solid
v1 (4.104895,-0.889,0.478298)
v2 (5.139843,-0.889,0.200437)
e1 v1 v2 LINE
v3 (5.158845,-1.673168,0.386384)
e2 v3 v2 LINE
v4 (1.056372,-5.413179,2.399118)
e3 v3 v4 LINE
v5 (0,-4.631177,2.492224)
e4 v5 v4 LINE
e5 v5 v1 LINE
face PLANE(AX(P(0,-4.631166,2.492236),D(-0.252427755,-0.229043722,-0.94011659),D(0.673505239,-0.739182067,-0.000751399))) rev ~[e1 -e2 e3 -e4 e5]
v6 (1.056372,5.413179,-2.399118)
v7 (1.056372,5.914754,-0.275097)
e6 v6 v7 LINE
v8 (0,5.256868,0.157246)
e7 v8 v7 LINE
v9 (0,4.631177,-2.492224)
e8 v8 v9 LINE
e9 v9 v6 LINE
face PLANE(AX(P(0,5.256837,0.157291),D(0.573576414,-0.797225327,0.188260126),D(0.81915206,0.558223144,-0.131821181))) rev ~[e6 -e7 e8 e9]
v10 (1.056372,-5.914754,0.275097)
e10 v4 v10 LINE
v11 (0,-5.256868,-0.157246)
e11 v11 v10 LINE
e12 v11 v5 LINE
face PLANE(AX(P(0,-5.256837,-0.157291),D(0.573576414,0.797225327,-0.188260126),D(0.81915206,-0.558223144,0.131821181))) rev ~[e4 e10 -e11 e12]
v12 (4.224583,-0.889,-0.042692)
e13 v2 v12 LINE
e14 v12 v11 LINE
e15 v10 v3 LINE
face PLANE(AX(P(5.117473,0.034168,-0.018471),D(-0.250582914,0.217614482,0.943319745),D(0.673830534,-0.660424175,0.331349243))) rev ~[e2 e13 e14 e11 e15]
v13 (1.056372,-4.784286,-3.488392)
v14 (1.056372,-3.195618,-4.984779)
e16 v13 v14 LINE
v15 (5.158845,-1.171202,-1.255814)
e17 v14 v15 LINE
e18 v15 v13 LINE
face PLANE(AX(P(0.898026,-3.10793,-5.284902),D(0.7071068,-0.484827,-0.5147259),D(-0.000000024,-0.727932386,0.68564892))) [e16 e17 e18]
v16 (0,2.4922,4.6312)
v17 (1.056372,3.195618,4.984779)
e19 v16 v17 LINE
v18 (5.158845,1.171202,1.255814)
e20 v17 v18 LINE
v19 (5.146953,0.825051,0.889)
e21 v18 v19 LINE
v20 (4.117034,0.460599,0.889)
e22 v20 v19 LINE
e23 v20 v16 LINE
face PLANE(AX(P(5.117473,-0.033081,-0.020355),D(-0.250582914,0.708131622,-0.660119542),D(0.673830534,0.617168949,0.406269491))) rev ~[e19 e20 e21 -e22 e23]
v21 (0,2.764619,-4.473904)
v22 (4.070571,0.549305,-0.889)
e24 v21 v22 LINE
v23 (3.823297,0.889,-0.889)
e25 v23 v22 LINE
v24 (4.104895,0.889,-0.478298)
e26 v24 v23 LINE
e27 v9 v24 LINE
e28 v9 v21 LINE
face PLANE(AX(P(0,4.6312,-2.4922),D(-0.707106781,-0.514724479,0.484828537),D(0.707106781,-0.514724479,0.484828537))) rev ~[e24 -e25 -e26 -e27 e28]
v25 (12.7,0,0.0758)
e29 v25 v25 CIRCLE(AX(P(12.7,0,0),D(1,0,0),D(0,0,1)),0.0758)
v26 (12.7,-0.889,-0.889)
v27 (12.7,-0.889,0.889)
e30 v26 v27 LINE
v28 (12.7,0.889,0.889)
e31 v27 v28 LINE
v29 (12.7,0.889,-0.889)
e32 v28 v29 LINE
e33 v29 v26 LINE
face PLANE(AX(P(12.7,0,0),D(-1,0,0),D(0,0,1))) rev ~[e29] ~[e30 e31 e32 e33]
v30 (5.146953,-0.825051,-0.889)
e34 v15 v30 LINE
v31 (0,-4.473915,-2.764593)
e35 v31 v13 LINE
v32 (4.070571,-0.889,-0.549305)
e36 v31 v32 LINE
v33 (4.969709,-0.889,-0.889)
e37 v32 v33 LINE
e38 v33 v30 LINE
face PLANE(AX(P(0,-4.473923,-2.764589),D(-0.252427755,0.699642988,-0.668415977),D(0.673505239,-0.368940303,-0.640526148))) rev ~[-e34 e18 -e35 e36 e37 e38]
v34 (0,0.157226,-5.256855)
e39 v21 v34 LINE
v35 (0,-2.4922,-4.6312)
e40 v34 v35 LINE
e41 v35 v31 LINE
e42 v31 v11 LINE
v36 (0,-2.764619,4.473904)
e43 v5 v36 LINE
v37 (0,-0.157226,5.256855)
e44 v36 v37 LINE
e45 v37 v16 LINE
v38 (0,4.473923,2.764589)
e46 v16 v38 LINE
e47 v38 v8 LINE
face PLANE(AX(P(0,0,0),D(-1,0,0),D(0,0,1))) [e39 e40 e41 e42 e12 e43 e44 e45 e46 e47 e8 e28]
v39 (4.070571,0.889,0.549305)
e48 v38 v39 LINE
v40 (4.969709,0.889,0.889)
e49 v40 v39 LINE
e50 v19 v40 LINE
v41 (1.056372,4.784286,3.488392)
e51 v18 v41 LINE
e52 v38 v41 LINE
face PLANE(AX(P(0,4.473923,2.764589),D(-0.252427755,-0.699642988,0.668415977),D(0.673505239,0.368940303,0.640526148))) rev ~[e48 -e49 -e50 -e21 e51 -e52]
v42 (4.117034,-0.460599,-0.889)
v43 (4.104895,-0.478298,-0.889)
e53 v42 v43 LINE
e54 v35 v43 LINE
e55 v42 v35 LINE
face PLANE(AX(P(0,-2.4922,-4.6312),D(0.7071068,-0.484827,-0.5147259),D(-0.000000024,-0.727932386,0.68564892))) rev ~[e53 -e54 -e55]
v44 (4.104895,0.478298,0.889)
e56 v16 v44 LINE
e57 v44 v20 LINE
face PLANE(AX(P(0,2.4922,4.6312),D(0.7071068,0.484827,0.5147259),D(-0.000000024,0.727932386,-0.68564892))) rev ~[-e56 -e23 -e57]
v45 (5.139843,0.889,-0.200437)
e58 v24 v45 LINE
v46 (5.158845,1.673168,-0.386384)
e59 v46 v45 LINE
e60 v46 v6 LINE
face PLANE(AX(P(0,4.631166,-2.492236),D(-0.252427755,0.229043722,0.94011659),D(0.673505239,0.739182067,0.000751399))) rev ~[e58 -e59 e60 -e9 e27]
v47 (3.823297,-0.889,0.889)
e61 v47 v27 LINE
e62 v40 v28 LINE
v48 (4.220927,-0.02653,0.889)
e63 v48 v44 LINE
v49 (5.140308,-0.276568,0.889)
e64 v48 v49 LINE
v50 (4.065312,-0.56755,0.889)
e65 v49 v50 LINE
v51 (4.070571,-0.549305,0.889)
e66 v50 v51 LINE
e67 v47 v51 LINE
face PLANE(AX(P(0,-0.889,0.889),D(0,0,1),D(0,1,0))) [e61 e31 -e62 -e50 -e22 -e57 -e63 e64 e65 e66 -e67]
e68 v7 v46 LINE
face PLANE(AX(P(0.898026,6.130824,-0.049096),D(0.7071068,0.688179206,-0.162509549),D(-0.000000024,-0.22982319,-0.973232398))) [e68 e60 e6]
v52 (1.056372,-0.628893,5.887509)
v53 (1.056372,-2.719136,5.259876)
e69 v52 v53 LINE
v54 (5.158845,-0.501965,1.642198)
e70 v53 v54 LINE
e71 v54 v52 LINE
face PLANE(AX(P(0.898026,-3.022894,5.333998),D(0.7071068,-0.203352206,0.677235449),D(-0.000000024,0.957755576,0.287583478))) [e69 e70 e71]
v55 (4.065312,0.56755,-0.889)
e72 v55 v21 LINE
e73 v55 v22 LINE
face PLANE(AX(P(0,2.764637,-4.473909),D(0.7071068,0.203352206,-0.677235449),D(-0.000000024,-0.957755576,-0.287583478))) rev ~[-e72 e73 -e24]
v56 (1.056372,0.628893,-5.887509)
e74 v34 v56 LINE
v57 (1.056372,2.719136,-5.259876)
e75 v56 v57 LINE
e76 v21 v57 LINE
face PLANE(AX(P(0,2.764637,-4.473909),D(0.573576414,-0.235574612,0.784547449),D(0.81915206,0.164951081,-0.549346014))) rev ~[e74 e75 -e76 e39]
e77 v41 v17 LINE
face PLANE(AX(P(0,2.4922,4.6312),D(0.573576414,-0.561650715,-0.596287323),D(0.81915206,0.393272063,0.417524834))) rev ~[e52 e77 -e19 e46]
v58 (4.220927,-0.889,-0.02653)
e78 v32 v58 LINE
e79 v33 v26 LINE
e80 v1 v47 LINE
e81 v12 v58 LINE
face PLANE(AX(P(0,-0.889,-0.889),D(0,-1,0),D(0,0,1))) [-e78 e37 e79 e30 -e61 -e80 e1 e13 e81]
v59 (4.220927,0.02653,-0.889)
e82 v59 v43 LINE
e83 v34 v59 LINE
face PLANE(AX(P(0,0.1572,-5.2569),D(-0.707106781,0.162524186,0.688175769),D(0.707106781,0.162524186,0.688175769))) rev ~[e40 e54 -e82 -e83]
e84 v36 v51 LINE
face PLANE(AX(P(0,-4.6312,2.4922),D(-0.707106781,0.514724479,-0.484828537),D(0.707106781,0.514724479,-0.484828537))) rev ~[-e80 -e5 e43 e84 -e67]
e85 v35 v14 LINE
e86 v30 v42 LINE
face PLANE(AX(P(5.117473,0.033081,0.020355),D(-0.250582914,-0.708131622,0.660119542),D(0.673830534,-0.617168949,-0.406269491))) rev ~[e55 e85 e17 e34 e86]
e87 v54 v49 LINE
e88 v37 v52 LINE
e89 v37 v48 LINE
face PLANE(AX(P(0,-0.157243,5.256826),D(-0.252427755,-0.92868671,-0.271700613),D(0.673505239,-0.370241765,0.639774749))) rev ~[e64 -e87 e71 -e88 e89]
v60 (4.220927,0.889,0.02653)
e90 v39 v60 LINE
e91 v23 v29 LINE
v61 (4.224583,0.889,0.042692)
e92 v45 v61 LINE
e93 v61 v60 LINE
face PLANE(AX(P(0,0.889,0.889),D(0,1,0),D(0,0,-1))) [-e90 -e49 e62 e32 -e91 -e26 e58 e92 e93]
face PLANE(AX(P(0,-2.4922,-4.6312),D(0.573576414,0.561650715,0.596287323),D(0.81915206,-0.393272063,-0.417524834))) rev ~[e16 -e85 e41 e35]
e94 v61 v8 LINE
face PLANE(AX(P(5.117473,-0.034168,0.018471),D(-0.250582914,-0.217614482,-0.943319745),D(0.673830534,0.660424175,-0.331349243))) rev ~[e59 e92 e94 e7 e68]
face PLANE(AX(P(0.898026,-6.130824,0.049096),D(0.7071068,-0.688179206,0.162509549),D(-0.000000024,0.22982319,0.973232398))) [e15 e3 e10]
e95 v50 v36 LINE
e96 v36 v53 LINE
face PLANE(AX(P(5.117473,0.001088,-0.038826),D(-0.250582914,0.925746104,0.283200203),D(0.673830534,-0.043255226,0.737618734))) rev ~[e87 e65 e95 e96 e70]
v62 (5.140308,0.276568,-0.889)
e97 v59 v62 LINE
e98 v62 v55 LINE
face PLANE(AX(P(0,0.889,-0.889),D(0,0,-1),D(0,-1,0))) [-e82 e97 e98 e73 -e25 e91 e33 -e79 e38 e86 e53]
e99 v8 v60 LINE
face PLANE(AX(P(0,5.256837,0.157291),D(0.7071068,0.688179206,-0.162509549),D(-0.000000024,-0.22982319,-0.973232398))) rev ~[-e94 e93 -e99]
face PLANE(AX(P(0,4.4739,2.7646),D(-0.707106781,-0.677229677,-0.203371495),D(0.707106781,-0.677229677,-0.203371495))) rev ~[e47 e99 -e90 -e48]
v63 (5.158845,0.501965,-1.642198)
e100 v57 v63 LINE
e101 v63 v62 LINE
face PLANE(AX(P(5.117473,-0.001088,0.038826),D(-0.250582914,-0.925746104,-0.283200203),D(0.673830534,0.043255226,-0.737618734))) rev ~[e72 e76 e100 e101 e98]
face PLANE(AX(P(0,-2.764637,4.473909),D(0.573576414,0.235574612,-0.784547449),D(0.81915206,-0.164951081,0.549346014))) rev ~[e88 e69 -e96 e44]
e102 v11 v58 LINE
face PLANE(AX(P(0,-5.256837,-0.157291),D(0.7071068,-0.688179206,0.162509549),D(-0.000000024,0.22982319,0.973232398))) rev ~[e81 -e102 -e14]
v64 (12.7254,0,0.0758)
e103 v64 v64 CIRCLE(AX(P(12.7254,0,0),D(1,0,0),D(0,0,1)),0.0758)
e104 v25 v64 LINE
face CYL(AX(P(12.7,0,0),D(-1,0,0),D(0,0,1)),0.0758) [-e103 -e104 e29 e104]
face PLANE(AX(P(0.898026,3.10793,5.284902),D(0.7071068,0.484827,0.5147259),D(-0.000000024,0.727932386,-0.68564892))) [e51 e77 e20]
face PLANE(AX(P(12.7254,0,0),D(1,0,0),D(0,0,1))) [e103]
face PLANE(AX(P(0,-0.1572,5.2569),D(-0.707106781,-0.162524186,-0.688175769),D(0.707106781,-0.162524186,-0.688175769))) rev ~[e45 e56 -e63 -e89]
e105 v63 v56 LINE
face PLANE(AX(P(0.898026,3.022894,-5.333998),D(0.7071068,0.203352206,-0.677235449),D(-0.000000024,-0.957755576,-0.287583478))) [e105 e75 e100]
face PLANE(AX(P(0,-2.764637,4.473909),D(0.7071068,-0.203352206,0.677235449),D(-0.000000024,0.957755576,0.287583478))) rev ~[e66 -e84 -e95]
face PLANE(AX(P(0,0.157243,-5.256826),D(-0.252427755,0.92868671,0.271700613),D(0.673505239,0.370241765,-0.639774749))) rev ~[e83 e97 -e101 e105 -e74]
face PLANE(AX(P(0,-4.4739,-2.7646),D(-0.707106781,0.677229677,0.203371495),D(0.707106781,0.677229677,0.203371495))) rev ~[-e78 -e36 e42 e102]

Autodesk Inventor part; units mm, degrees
ref_plane "YZ Plane" through (0, 0, 0) normal (1, 0, 0) x (0, 1, 0)
ref_plane "XZ Plane" through (0, 0, 0) normal (0, 1, 0) x (-1, 0, 0)
ref_plane "XY Plane" through (0, 0, 0) normal (0, 0, 1) x (1, 0, 0)
sketch "Sketch6" plane through (0, 0, 0) normal (1, 0, 0) x (0, 1, 0)
  line L0 (5.2569, 0.1572) -> (4.6312, -2.4922)
  line L1 (4.6312, -2.4922) -> (2.7646, -4.4739)
  line L2 (2.7646, -4.4739) -> (0.1572, -5.2569)
  line L3 (0.1572, -5.2569) -> (-2.4922, -4.6312)
  line L4 (-2.4922, -4.6312) -> (-4.4739, -2.7646)
  line L5 (-4.4739, -2.7646) -> (-5.2569, -0.1572)
  line L6 (-5.2569, -0.1572) -> (-4.6312, 2.4922)
  line L7 (-4.6312, 2.4922) -> (-2.7646, 4.4739)
  line L8 (-2.7646, 4.4739) -> (-0.1572, 5.2569)
  line L9 (-0.1572, 5.2569) -> (2.4922, 4.6312)
  line L10 (2.4922, 4.6312) -> (4.4739, 2.7646)
  line L11 (4.4739, 2.7646) -> (5.2569, 0.1572)
  point P0 (0, 0)
  point P1 (0, 0)
  dimension "d27" = 5.08
extrude "Extrusion2" add sketch "Sketch6" along normal blind 6.096 draft -45
sketch "Sketch7" plane through (0, 2.4922, 4.6312) normal (0.7071068, 0.484827, 0.5147259) x (0, 0.7279324, -0.6856489)
  line L0 (0, 0) -> (2.7224, 0)
  line L1 (0, 0) -> (2.7224, 0) projected
  line L2 (2.7224, 0) -> (1.3511, -7.2372)
  line L3 (2.7224, 0) -> (1.3612, -7.1842) projected
  line L4 (1.3511, -7.2372) -> (0, 0)
  point P0 (1.3612, -3.5921)
  dimension "d38" = 0
  dimension "d30" = 7.366
extrude "Extrusion3" add sketch "Sketch7" along normal blind 1.27 draft -10
sketch "Sketch8" plane through (0, 0, 0) normal (-1, 0, 0) x (0, 0, 1)
  line L0 (-0.889, -0.889) -> (0.889, -0.889)
  line L1 (0.889, -0.889) -> (0.889, 0.889)
  line L2 (0.889, 0.889) -> (-0.889, 0.889)
  line L3 (-0.889, 0.889) -> (-0.889, -0.889)
  line L4 (-0.889, -0.889) -> (0.889, 0.889) construction
  line L5 (0.889, -0.889) -> (-0.889, 0.889) construction
  point P0 (0, 0)
  dimension "d33" = 1.778
  dimension "d34" = 1.778
extrude "Extrusion4" add sketch "Sketch8" against normal blind 12.7
sketch "Sketch9" plane through (12.7, 0, 0) normal (1, 0, 0) x (0, 0, 1)
  circle A0 centre (0, 0) radius 0.0758
  point P0 (0, 0)
extrude "Extrusion5" add sketch "Sketch9" along normal blind 0.0254
pattern_circular "Circular Pattern1" count 6 over 360 about axis through (12.7, 0, 0) along (1, 0, 0) of "Extrusion3"
properties part number "RotateGear"
